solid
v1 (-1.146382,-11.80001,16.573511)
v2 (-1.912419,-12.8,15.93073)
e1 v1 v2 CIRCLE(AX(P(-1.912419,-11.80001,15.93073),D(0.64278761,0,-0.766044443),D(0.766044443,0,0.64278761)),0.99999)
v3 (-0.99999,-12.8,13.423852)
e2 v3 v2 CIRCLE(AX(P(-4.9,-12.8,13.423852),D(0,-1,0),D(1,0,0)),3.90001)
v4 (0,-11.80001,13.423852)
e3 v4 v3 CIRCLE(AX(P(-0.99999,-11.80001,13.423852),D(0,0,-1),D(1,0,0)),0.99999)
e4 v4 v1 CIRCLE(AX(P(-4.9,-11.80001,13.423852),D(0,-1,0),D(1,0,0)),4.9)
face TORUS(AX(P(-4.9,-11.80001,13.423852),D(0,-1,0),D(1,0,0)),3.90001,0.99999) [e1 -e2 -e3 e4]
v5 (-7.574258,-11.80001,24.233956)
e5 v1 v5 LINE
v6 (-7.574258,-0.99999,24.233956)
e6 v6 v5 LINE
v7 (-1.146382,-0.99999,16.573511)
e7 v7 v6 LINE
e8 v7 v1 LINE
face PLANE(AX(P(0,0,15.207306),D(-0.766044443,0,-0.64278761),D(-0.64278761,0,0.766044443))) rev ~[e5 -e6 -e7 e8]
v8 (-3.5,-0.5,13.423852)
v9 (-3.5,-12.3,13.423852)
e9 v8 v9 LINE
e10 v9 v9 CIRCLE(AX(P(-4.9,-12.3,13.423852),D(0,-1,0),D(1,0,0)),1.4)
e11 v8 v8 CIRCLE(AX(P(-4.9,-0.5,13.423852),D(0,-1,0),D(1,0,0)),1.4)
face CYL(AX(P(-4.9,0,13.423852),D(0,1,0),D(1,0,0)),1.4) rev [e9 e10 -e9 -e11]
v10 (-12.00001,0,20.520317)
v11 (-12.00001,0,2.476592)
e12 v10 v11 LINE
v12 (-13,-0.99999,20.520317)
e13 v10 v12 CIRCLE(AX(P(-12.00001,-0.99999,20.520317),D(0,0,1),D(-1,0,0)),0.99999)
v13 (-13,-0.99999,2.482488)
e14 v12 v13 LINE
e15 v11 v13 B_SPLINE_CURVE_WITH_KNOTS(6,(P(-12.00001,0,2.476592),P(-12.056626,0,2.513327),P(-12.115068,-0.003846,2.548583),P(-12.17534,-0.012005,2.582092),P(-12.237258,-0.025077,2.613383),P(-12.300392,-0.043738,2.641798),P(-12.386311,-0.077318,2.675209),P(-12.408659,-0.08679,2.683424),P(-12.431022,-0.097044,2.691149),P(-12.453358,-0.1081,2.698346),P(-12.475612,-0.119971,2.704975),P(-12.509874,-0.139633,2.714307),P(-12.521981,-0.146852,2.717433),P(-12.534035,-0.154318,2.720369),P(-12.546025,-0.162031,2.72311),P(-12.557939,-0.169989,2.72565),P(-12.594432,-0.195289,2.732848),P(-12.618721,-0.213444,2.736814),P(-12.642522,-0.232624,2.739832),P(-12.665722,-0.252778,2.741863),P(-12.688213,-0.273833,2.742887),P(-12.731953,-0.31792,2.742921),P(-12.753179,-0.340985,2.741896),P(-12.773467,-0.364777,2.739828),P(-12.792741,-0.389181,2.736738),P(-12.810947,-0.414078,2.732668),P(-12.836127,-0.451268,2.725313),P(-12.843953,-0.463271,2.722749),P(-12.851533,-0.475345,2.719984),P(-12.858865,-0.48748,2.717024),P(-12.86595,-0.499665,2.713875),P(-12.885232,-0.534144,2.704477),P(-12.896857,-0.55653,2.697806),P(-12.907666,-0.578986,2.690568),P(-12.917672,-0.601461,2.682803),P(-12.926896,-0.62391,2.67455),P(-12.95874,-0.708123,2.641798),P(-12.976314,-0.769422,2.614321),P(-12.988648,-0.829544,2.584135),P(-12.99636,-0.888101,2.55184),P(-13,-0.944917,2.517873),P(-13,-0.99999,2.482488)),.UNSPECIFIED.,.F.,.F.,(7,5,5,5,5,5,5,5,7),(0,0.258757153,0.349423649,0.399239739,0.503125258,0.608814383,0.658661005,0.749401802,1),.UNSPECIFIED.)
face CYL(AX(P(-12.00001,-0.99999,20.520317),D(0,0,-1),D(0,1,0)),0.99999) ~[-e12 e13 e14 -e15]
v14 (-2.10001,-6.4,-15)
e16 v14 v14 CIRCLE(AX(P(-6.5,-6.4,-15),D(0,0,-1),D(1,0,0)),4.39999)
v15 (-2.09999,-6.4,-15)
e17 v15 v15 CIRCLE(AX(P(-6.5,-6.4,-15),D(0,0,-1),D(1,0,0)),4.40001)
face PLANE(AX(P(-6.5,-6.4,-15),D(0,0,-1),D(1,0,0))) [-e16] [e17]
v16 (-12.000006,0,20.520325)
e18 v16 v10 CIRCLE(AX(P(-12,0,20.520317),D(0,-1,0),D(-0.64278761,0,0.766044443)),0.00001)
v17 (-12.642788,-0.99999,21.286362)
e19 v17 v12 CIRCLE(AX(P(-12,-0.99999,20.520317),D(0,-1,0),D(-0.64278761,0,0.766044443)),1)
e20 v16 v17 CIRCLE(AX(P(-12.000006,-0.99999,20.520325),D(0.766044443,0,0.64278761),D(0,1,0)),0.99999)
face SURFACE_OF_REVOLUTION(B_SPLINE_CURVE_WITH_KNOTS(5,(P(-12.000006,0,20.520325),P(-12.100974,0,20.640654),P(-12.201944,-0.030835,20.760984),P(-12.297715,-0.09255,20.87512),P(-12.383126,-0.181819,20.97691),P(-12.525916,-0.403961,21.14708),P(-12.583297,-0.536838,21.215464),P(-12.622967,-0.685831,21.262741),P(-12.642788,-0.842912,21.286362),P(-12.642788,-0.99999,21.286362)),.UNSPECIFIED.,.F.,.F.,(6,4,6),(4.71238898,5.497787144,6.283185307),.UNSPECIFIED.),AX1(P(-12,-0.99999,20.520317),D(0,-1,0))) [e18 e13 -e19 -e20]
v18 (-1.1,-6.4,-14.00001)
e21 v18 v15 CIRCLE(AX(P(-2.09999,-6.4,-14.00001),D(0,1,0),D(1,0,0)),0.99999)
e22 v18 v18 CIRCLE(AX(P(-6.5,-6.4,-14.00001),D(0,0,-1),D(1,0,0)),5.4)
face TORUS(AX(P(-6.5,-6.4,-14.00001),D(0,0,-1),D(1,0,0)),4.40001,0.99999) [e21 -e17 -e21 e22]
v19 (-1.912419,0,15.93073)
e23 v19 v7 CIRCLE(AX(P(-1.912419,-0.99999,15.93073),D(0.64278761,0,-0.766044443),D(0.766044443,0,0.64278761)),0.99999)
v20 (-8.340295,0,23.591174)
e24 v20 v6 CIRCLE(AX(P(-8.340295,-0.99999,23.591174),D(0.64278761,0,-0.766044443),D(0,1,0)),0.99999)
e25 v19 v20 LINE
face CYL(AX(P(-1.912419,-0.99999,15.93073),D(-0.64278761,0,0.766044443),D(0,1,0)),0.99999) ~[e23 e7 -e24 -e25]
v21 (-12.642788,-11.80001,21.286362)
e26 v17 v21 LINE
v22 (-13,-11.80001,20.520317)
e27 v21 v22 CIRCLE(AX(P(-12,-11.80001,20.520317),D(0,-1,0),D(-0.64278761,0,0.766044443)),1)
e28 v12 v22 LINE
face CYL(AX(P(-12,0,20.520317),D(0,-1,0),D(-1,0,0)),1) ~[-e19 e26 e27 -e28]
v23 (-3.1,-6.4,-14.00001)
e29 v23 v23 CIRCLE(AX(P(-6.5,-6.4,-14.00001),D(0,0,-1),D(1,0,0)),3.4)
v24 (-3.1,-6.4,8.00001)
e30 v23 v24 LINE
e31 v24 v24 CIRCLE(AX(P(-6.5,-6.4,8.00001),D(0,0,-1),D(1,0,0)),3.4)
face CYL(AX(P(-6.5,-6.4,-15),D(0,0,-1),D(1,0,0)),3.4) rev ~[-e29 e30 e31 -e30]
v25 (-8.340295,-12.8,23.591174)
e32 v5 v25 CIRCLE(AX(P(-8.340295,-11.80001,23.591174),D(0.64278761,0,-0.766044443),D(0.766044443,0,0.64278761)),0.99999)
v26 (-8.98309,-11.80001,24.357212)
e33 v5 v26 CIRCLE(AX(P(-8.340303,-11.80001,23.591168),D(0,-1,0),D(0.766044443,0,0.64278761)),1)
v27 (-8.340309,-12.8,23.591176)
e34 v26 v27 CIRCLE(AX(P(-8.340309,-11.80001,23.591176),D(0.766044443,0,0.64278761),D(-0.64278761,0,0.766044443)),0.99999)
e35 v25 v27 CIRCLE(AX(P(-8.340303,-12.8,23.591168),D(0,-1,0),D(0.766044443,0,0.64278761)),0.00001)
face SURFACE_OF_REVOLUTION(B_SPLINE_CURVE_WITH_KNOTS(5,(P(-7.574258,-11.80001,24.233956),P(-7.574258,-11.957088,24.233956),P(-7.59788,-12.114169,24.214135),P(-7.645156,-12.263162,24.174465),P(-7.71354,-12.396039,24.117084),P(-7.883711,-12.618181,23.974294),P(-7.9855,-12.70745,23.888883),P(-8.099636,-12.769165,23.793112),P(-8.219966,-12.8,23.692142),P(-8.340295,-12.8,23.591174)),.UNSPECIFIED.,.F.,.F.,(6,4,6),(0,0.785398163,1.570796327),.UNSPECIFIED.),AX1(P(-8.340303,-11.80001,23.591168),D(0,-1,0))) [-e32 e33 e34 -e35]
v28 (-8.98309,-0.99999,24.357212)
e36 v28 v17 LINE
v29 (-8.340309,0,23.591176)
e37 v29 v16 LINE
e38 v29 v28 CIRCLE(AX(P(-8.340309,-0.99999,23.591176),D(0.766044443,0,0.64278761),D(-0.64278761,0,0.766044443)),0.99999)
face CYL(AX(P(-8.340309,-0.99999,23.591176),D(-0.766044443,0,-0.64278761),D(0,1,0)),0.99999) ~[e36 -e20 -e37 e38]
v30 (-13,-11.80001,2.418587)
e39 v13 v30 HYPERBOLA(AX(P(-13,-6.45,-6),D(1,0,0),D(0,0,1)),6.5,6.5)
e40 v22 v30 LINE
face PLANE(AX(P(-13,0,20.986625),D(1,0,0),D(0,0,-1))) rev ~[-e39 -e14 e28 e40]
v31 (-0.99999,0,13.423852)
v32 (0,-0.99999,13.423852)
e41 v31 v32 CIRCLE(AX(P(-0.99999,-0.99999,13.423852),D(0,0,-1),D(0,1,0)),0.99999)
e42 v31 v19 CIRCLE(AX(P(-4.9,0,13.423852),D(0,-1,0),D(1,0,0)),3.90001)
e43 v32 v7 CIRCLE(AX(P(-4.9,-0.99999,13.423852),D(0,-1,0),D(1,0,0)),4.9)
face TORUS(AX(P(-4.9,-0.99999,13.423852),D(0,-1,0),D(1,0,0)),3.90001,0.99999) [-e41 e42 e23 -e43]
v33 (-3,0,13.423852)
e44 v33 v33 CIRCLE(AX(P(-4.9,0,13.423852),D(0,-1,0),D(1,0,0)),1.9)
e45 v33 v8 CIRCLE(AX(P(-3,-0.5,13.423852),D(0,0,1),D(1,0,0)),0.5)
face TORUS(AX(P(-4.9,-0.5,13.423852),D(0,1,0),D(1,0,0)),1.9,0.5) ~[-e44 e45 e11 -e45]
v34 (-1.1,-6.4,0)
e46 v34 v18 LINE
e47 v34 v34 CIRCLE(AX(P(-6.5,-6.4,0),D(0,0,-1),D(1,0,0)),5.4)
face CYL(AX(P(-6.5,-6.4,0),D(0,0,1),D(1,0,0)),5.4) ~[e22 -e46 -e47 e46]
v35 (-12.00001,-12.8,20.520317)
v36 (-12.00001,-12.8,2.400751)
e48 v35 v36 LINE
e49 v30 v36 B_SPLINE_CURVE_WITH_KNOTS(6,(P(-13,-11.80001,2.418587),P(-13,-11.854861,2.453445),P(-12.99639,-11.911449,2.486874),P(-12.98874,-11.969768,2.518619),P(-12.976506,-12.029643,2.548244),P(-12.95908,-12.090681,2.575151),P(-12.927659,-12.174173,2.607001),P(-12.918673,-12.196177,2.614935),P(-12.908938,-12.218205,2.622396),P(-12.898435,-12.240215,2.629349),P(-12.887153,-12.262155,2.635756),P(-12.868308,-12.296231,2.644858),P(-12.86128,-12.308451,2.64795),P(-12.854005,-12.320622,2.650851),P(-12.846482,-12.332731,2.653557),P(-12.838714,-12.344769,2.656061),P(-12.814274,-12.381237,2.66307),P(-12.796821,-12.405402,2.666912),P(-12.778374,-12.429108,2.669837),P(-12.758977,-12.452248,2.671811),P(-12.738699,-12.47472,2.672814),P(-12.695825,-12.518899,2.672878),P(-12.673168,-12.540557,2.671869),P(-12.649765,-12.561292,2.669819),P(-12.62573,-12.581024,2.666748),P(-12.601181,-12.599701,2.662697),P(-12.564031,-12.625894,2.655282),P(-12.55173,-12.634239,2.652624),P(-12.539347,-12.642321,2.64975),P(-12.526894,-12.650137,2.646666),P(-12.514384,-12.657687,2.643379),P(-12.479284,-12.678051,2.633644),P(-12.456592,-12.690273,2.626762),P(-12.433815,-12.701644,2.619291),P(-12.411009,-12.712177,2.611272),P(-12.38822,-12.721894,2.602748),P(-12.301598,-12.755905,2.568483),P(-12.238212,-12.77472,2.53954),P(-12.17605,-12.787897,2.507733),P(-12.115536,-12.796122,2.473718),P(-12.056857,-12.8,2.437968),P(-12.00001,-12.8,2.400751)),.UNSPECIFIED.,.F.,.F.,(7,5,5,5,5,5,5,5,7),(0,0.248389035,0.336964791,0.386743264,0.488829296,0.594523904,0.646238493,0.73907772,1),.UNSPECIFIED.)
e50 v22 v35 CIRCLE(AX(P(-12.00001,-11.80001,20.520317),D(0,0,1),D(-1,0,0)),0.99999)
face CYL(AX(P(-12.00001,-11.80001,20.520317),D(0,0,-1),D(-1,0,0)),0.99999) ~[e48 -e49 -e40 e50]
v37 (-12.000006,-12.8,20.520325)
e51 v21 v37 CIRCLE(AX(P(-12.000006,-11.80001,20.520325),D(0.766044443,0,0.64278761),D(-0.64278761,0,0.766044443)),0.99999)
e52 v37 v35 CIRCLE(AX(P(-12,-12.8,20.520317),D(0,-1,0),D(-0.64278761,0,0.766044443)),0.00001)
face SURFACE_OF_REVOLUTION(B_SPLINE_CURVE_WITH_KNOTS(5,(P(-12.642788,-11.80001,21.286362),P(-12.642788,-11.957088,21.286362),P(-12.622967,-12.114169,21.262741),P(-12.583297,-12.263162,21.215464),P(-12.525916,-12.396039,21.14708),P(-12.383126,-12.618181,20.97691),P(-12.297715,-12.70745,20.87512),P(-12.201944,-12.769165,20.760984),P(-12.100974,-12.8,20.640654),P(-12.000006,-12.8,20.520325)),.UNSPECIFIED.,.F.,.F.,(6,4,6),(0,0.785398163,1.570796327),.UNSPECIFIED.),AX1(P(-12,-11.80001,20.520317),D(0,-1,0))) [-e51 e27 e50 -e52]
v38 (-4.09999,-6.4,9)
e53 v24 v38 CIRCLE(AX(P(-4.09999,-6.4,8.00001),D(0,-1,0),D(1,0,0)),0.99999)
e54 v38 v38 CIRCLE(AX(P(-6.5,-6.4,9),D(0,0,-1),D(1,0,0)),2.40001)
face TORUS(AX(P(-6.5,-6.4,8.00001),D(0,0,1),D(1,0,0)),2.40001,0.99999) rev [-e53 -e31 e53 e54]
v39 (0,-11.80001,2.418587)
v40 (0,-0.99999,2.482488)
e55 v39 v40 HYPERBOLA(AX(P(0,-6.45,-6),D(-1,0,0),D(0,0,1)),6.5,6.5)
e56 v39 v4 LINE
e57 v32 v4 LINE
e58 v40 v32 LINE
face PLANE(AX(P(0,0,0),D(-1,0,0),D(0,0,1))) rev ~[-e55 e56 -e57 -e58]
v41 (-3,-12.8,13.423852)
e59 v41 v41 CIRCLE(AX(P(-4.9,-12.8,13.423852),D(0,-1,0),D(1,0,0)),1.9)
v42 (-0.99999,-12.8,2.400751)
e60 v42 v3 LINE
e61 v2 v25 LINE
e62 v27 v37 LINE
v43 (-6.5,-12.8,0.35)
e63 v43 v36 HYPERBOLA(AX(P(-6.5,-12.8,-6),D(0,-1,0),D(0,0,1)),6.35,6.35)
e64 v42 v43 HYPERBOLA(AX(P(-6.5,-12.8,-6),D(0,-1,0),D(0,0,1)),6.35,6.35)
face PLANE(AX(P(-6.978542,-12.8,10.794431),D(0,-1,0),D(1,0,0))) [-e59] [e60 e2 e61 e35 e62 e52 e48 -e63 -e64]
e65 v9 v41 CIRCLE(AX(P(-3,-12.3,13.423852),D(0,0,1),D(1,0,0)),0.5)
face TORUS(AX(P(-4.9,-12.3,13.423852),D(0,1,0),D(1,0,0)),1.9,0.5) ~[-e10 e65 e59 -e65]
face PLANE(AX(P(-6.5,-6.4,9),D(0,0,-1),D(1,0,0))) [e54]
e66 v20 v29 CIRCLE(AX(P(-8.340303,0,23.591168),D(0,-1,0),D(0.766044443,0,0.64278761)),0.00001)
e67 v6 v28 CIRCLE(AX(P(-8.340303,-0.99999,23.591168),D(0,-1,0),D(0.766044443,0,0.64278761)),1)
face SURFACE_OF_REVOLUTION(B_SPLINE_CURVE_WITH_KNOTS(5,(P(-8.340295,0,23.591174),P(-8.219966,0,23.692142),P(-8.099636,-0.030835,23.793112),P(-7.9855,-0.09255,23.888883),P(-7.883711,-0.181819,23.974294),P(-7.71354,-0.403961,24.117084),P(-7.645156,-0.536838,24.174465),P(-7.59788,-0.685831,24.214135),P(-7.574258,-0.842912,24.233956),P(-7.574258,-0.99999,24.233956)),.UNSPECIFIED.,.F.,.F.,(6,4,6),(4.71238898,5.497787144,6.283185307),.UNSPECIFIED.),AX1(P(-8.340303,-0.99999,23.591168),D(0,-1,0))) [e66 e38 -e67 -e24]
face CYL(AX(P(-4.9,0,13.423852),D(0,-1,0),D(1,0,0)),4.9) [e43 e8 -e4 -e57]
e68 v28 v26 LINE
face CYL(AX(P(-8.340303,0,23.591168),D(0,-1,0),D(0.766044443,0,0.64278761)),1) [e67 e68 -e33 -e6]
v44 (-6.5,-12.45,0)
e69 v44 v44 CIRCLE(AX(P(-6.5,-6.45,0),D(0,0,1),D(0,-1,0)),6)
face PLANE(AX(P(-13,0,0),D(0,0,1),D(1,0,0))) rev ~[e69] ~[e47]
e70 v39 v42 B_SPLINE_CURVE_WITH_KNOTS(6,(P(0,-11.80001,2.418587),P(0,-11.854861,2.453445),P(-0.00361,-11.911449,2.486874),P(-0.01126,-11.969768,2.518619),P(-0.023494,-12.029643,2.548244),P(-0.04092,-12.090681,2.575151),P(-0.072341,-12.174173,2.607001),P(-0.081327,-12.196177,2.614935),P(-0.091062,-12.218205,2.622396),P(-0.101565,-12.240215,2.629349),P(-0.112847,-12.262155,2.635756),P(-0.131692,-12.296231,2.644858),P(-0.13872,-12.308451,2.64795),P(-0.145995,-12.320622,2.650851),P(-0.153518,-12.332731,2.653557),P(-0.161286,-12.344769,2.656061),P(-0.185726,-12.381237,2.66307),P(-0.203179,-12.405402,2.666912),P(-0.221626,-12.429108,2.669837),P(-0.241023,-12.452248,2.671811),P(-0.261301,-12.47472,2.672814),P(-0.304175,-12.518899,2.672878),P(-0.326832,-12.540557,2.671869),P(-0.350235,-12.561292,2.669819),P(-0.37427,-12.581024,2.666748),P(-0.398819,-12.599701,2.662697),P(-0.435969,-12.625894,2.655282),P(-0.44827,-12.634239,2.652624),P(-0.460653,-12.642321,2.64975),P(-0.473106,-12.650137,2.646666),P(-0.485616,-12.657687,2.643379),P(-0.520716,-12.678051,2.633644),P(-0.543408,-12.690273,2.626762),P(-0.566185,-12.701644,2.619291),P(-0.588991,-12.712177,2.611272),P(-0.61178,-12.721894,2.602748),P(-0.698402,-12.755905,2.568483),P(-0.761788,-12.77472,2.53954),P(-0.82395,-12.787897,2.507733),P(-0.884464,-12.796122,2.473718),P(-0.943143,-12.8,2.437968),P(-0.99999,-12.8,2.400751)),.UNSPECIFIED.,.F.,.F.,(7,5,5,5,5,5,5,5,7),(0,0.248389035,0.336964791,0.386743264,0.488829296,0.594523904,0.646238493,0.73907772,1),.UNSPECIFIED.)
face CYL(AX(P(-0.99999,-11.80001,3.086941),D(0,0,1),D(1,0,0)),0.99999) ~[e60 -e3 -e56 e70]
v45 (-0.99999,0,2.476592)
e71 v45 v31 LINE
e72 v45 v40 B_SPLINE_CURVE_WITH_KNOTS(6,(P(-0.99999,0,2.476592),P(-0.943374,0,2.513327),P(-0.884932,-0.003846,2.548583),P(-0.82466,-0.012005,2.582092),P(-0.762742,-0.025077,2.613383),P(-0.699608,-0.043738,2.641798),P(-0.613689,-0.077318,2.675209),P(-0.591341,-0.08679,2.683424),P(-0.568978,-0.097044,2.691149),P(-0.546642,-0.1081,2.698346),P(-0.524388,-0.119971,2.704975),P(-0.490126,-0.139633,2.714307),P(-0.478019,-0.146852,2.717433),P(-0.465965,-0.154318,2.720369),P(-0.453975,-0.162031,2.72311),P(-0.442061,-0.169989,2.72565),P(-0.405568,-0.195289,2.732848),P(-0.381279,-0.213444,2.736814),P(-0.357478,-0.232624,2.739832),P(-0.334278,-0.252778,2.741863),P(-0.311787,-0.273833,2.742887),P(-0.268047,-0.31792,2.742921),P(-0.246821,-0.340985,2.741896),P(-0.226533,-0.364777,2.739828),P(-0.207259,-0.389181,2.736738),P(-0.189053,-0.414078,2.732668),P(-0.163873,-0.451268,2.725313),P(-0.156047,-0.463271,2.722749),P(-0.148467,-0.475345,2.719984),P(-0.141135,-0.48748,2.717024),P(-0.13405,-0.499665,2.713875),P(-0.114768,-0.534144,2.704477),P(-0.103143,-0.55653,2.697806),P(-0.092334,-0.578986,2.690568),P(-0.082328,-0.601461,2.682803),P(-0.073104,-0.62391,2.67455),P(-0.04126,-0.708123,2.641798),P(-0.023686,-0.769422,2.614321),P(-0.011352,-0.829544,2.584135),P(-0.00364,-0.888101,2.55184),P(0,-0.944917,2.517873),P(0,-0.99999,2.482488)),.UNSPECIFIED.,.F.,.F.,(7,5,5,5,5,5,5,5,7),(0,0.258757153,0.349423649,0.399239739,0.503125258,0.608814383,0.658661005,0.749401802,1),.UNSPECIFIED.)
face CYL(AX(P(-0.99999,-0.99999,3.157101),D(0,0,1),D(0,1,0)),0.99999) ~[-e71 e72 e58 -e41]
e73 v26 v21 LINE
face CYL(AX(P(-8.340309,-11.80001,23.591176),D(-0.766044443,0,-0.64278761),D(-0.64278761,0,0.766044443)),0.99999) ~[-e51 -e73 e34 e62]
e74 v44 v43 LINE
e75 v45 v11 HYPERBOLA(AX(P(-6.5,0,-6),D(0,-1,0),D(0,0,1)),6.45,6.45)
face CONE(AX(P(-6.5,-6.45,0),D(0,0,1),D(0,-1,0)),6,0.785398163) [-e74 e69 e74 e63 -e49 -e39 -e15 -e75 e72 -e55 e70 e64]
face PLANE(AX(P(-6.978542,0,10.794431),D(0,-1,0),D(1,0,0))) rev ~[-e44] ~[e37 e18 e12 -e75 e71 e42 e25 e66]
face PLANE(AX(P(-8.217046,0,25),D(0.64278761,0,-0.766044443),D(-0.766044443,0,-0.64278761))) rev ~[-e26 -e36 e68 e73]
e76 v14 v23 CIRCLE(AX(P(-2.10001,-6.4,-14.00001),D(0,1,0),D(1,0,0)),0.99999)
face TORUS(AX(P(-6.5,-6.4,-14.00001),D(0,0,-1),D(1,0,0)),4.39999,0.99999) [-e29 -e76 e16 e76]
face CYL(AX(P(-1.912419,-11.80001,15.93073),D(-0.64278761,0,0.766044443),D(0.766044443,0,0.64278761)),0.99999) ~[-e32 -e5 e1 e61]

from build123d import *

# Parameters (mm, degrees)
F0_R      = 1.4
F1_DEPTH  = 12.8
F2_R      = 4.9
F3_R      = 1
F4_R      = 5.4
F5_DEPTH  = 15
F9_R      = 3.4
F10_DEPTH = 24
F11_R     = 0.99999
F12_R     = 0.5


# Not quite as in the source:
# - a fillet or chamfer is up to 0.001 mm smaller than in the source, because OpenCascade refuses the exact size


with BuildPart() as f1:
    # F0 (on Front) → F1 (new body)
    with BuildSketch(Plane.XZ):
        Polygon((-13, 0), (0, 0), (0, 15.2073059861), (-8.2170459353, 25), (-13, 20.9866250083), align=None)
        with Locations((-4.9, 13.4238518382)):
            Circle(F0_R, mode=Mode.SUBTRACT)
    extrude(amount=F1_DEPTH)

    # F2
    f2_edges = [f1.edges().sort_by_distance(p)[0] for p in [
        (0, -6.4, 15.207306),
    ]]
    fillet(f2_edges, radius=F2_R)

    # F3
    f3_edges = [f1.edges().sort_by_distance(p)[0] for p in [
        (-8.217046, -6.4, 25),
        (-13, -6.4, 20.986625),
    ]]
    fillet(f3_edges, radius=F3_R)

    # F4 (on face) → F5 (join)
    with BuildSketch(Plane(origin=(0, 0, 0), x_dir=(1, 0, 0), z_dir=(0, 0, -1))):
        with Locations((-6.5, 6.4)):
            Circle(F4_R)
    extrude(amount=F5_DEPTH)

    # F7 (on offset) → F8 (revolve, cut)
    with BuildSketch(Plane.YZ.offset(-6.5)):
        Polygon((-17.45, 0), (-12.45, 0), (-17.45, 5), align=None)
    revolve(axis=Axis((-6.5, -6.45, -7.3510144139), (0, 0, 1)), mode=Mode.SUBTRACT)

    # F9 (on face) → F10 (cut)
    with BuildSketch(Plane(origin=(0, 0, -15), x_dir=(1, 0, 0), z_dir=(0, 0, -1))):
        with Locations((-6.5, 6.4)):
            Circle(F9_R)
    extrude(amount=-F10_DEPTH, mode=Mode.SUBTRACT)

    # F11 (radius 1 in the source; OpenCascade refuses exactly that, so slightly less here)
    f11_edges = [f1.edges().sort_by_distance(p)[0] for p in [
        (-11.9, -6.4, -15),
        (-9.9, -6.4, -15),
        (-13, 0, 11.838709),
        (0, -12.8, 8.255397),
        (-9.9, -6.4, 9),
    ]]
    fillet(f11_edges, radius=F11_R)

    # F12
    f12_edges = [f1.edges().sort_by_distance(p)[0] for p in [
        (-6.3, -12.8, 13.423852),
        (-6.3, 0, 13.423852),
    ]]
    fillet(f12_edges, radius=F12_R)


solid = f1.part
